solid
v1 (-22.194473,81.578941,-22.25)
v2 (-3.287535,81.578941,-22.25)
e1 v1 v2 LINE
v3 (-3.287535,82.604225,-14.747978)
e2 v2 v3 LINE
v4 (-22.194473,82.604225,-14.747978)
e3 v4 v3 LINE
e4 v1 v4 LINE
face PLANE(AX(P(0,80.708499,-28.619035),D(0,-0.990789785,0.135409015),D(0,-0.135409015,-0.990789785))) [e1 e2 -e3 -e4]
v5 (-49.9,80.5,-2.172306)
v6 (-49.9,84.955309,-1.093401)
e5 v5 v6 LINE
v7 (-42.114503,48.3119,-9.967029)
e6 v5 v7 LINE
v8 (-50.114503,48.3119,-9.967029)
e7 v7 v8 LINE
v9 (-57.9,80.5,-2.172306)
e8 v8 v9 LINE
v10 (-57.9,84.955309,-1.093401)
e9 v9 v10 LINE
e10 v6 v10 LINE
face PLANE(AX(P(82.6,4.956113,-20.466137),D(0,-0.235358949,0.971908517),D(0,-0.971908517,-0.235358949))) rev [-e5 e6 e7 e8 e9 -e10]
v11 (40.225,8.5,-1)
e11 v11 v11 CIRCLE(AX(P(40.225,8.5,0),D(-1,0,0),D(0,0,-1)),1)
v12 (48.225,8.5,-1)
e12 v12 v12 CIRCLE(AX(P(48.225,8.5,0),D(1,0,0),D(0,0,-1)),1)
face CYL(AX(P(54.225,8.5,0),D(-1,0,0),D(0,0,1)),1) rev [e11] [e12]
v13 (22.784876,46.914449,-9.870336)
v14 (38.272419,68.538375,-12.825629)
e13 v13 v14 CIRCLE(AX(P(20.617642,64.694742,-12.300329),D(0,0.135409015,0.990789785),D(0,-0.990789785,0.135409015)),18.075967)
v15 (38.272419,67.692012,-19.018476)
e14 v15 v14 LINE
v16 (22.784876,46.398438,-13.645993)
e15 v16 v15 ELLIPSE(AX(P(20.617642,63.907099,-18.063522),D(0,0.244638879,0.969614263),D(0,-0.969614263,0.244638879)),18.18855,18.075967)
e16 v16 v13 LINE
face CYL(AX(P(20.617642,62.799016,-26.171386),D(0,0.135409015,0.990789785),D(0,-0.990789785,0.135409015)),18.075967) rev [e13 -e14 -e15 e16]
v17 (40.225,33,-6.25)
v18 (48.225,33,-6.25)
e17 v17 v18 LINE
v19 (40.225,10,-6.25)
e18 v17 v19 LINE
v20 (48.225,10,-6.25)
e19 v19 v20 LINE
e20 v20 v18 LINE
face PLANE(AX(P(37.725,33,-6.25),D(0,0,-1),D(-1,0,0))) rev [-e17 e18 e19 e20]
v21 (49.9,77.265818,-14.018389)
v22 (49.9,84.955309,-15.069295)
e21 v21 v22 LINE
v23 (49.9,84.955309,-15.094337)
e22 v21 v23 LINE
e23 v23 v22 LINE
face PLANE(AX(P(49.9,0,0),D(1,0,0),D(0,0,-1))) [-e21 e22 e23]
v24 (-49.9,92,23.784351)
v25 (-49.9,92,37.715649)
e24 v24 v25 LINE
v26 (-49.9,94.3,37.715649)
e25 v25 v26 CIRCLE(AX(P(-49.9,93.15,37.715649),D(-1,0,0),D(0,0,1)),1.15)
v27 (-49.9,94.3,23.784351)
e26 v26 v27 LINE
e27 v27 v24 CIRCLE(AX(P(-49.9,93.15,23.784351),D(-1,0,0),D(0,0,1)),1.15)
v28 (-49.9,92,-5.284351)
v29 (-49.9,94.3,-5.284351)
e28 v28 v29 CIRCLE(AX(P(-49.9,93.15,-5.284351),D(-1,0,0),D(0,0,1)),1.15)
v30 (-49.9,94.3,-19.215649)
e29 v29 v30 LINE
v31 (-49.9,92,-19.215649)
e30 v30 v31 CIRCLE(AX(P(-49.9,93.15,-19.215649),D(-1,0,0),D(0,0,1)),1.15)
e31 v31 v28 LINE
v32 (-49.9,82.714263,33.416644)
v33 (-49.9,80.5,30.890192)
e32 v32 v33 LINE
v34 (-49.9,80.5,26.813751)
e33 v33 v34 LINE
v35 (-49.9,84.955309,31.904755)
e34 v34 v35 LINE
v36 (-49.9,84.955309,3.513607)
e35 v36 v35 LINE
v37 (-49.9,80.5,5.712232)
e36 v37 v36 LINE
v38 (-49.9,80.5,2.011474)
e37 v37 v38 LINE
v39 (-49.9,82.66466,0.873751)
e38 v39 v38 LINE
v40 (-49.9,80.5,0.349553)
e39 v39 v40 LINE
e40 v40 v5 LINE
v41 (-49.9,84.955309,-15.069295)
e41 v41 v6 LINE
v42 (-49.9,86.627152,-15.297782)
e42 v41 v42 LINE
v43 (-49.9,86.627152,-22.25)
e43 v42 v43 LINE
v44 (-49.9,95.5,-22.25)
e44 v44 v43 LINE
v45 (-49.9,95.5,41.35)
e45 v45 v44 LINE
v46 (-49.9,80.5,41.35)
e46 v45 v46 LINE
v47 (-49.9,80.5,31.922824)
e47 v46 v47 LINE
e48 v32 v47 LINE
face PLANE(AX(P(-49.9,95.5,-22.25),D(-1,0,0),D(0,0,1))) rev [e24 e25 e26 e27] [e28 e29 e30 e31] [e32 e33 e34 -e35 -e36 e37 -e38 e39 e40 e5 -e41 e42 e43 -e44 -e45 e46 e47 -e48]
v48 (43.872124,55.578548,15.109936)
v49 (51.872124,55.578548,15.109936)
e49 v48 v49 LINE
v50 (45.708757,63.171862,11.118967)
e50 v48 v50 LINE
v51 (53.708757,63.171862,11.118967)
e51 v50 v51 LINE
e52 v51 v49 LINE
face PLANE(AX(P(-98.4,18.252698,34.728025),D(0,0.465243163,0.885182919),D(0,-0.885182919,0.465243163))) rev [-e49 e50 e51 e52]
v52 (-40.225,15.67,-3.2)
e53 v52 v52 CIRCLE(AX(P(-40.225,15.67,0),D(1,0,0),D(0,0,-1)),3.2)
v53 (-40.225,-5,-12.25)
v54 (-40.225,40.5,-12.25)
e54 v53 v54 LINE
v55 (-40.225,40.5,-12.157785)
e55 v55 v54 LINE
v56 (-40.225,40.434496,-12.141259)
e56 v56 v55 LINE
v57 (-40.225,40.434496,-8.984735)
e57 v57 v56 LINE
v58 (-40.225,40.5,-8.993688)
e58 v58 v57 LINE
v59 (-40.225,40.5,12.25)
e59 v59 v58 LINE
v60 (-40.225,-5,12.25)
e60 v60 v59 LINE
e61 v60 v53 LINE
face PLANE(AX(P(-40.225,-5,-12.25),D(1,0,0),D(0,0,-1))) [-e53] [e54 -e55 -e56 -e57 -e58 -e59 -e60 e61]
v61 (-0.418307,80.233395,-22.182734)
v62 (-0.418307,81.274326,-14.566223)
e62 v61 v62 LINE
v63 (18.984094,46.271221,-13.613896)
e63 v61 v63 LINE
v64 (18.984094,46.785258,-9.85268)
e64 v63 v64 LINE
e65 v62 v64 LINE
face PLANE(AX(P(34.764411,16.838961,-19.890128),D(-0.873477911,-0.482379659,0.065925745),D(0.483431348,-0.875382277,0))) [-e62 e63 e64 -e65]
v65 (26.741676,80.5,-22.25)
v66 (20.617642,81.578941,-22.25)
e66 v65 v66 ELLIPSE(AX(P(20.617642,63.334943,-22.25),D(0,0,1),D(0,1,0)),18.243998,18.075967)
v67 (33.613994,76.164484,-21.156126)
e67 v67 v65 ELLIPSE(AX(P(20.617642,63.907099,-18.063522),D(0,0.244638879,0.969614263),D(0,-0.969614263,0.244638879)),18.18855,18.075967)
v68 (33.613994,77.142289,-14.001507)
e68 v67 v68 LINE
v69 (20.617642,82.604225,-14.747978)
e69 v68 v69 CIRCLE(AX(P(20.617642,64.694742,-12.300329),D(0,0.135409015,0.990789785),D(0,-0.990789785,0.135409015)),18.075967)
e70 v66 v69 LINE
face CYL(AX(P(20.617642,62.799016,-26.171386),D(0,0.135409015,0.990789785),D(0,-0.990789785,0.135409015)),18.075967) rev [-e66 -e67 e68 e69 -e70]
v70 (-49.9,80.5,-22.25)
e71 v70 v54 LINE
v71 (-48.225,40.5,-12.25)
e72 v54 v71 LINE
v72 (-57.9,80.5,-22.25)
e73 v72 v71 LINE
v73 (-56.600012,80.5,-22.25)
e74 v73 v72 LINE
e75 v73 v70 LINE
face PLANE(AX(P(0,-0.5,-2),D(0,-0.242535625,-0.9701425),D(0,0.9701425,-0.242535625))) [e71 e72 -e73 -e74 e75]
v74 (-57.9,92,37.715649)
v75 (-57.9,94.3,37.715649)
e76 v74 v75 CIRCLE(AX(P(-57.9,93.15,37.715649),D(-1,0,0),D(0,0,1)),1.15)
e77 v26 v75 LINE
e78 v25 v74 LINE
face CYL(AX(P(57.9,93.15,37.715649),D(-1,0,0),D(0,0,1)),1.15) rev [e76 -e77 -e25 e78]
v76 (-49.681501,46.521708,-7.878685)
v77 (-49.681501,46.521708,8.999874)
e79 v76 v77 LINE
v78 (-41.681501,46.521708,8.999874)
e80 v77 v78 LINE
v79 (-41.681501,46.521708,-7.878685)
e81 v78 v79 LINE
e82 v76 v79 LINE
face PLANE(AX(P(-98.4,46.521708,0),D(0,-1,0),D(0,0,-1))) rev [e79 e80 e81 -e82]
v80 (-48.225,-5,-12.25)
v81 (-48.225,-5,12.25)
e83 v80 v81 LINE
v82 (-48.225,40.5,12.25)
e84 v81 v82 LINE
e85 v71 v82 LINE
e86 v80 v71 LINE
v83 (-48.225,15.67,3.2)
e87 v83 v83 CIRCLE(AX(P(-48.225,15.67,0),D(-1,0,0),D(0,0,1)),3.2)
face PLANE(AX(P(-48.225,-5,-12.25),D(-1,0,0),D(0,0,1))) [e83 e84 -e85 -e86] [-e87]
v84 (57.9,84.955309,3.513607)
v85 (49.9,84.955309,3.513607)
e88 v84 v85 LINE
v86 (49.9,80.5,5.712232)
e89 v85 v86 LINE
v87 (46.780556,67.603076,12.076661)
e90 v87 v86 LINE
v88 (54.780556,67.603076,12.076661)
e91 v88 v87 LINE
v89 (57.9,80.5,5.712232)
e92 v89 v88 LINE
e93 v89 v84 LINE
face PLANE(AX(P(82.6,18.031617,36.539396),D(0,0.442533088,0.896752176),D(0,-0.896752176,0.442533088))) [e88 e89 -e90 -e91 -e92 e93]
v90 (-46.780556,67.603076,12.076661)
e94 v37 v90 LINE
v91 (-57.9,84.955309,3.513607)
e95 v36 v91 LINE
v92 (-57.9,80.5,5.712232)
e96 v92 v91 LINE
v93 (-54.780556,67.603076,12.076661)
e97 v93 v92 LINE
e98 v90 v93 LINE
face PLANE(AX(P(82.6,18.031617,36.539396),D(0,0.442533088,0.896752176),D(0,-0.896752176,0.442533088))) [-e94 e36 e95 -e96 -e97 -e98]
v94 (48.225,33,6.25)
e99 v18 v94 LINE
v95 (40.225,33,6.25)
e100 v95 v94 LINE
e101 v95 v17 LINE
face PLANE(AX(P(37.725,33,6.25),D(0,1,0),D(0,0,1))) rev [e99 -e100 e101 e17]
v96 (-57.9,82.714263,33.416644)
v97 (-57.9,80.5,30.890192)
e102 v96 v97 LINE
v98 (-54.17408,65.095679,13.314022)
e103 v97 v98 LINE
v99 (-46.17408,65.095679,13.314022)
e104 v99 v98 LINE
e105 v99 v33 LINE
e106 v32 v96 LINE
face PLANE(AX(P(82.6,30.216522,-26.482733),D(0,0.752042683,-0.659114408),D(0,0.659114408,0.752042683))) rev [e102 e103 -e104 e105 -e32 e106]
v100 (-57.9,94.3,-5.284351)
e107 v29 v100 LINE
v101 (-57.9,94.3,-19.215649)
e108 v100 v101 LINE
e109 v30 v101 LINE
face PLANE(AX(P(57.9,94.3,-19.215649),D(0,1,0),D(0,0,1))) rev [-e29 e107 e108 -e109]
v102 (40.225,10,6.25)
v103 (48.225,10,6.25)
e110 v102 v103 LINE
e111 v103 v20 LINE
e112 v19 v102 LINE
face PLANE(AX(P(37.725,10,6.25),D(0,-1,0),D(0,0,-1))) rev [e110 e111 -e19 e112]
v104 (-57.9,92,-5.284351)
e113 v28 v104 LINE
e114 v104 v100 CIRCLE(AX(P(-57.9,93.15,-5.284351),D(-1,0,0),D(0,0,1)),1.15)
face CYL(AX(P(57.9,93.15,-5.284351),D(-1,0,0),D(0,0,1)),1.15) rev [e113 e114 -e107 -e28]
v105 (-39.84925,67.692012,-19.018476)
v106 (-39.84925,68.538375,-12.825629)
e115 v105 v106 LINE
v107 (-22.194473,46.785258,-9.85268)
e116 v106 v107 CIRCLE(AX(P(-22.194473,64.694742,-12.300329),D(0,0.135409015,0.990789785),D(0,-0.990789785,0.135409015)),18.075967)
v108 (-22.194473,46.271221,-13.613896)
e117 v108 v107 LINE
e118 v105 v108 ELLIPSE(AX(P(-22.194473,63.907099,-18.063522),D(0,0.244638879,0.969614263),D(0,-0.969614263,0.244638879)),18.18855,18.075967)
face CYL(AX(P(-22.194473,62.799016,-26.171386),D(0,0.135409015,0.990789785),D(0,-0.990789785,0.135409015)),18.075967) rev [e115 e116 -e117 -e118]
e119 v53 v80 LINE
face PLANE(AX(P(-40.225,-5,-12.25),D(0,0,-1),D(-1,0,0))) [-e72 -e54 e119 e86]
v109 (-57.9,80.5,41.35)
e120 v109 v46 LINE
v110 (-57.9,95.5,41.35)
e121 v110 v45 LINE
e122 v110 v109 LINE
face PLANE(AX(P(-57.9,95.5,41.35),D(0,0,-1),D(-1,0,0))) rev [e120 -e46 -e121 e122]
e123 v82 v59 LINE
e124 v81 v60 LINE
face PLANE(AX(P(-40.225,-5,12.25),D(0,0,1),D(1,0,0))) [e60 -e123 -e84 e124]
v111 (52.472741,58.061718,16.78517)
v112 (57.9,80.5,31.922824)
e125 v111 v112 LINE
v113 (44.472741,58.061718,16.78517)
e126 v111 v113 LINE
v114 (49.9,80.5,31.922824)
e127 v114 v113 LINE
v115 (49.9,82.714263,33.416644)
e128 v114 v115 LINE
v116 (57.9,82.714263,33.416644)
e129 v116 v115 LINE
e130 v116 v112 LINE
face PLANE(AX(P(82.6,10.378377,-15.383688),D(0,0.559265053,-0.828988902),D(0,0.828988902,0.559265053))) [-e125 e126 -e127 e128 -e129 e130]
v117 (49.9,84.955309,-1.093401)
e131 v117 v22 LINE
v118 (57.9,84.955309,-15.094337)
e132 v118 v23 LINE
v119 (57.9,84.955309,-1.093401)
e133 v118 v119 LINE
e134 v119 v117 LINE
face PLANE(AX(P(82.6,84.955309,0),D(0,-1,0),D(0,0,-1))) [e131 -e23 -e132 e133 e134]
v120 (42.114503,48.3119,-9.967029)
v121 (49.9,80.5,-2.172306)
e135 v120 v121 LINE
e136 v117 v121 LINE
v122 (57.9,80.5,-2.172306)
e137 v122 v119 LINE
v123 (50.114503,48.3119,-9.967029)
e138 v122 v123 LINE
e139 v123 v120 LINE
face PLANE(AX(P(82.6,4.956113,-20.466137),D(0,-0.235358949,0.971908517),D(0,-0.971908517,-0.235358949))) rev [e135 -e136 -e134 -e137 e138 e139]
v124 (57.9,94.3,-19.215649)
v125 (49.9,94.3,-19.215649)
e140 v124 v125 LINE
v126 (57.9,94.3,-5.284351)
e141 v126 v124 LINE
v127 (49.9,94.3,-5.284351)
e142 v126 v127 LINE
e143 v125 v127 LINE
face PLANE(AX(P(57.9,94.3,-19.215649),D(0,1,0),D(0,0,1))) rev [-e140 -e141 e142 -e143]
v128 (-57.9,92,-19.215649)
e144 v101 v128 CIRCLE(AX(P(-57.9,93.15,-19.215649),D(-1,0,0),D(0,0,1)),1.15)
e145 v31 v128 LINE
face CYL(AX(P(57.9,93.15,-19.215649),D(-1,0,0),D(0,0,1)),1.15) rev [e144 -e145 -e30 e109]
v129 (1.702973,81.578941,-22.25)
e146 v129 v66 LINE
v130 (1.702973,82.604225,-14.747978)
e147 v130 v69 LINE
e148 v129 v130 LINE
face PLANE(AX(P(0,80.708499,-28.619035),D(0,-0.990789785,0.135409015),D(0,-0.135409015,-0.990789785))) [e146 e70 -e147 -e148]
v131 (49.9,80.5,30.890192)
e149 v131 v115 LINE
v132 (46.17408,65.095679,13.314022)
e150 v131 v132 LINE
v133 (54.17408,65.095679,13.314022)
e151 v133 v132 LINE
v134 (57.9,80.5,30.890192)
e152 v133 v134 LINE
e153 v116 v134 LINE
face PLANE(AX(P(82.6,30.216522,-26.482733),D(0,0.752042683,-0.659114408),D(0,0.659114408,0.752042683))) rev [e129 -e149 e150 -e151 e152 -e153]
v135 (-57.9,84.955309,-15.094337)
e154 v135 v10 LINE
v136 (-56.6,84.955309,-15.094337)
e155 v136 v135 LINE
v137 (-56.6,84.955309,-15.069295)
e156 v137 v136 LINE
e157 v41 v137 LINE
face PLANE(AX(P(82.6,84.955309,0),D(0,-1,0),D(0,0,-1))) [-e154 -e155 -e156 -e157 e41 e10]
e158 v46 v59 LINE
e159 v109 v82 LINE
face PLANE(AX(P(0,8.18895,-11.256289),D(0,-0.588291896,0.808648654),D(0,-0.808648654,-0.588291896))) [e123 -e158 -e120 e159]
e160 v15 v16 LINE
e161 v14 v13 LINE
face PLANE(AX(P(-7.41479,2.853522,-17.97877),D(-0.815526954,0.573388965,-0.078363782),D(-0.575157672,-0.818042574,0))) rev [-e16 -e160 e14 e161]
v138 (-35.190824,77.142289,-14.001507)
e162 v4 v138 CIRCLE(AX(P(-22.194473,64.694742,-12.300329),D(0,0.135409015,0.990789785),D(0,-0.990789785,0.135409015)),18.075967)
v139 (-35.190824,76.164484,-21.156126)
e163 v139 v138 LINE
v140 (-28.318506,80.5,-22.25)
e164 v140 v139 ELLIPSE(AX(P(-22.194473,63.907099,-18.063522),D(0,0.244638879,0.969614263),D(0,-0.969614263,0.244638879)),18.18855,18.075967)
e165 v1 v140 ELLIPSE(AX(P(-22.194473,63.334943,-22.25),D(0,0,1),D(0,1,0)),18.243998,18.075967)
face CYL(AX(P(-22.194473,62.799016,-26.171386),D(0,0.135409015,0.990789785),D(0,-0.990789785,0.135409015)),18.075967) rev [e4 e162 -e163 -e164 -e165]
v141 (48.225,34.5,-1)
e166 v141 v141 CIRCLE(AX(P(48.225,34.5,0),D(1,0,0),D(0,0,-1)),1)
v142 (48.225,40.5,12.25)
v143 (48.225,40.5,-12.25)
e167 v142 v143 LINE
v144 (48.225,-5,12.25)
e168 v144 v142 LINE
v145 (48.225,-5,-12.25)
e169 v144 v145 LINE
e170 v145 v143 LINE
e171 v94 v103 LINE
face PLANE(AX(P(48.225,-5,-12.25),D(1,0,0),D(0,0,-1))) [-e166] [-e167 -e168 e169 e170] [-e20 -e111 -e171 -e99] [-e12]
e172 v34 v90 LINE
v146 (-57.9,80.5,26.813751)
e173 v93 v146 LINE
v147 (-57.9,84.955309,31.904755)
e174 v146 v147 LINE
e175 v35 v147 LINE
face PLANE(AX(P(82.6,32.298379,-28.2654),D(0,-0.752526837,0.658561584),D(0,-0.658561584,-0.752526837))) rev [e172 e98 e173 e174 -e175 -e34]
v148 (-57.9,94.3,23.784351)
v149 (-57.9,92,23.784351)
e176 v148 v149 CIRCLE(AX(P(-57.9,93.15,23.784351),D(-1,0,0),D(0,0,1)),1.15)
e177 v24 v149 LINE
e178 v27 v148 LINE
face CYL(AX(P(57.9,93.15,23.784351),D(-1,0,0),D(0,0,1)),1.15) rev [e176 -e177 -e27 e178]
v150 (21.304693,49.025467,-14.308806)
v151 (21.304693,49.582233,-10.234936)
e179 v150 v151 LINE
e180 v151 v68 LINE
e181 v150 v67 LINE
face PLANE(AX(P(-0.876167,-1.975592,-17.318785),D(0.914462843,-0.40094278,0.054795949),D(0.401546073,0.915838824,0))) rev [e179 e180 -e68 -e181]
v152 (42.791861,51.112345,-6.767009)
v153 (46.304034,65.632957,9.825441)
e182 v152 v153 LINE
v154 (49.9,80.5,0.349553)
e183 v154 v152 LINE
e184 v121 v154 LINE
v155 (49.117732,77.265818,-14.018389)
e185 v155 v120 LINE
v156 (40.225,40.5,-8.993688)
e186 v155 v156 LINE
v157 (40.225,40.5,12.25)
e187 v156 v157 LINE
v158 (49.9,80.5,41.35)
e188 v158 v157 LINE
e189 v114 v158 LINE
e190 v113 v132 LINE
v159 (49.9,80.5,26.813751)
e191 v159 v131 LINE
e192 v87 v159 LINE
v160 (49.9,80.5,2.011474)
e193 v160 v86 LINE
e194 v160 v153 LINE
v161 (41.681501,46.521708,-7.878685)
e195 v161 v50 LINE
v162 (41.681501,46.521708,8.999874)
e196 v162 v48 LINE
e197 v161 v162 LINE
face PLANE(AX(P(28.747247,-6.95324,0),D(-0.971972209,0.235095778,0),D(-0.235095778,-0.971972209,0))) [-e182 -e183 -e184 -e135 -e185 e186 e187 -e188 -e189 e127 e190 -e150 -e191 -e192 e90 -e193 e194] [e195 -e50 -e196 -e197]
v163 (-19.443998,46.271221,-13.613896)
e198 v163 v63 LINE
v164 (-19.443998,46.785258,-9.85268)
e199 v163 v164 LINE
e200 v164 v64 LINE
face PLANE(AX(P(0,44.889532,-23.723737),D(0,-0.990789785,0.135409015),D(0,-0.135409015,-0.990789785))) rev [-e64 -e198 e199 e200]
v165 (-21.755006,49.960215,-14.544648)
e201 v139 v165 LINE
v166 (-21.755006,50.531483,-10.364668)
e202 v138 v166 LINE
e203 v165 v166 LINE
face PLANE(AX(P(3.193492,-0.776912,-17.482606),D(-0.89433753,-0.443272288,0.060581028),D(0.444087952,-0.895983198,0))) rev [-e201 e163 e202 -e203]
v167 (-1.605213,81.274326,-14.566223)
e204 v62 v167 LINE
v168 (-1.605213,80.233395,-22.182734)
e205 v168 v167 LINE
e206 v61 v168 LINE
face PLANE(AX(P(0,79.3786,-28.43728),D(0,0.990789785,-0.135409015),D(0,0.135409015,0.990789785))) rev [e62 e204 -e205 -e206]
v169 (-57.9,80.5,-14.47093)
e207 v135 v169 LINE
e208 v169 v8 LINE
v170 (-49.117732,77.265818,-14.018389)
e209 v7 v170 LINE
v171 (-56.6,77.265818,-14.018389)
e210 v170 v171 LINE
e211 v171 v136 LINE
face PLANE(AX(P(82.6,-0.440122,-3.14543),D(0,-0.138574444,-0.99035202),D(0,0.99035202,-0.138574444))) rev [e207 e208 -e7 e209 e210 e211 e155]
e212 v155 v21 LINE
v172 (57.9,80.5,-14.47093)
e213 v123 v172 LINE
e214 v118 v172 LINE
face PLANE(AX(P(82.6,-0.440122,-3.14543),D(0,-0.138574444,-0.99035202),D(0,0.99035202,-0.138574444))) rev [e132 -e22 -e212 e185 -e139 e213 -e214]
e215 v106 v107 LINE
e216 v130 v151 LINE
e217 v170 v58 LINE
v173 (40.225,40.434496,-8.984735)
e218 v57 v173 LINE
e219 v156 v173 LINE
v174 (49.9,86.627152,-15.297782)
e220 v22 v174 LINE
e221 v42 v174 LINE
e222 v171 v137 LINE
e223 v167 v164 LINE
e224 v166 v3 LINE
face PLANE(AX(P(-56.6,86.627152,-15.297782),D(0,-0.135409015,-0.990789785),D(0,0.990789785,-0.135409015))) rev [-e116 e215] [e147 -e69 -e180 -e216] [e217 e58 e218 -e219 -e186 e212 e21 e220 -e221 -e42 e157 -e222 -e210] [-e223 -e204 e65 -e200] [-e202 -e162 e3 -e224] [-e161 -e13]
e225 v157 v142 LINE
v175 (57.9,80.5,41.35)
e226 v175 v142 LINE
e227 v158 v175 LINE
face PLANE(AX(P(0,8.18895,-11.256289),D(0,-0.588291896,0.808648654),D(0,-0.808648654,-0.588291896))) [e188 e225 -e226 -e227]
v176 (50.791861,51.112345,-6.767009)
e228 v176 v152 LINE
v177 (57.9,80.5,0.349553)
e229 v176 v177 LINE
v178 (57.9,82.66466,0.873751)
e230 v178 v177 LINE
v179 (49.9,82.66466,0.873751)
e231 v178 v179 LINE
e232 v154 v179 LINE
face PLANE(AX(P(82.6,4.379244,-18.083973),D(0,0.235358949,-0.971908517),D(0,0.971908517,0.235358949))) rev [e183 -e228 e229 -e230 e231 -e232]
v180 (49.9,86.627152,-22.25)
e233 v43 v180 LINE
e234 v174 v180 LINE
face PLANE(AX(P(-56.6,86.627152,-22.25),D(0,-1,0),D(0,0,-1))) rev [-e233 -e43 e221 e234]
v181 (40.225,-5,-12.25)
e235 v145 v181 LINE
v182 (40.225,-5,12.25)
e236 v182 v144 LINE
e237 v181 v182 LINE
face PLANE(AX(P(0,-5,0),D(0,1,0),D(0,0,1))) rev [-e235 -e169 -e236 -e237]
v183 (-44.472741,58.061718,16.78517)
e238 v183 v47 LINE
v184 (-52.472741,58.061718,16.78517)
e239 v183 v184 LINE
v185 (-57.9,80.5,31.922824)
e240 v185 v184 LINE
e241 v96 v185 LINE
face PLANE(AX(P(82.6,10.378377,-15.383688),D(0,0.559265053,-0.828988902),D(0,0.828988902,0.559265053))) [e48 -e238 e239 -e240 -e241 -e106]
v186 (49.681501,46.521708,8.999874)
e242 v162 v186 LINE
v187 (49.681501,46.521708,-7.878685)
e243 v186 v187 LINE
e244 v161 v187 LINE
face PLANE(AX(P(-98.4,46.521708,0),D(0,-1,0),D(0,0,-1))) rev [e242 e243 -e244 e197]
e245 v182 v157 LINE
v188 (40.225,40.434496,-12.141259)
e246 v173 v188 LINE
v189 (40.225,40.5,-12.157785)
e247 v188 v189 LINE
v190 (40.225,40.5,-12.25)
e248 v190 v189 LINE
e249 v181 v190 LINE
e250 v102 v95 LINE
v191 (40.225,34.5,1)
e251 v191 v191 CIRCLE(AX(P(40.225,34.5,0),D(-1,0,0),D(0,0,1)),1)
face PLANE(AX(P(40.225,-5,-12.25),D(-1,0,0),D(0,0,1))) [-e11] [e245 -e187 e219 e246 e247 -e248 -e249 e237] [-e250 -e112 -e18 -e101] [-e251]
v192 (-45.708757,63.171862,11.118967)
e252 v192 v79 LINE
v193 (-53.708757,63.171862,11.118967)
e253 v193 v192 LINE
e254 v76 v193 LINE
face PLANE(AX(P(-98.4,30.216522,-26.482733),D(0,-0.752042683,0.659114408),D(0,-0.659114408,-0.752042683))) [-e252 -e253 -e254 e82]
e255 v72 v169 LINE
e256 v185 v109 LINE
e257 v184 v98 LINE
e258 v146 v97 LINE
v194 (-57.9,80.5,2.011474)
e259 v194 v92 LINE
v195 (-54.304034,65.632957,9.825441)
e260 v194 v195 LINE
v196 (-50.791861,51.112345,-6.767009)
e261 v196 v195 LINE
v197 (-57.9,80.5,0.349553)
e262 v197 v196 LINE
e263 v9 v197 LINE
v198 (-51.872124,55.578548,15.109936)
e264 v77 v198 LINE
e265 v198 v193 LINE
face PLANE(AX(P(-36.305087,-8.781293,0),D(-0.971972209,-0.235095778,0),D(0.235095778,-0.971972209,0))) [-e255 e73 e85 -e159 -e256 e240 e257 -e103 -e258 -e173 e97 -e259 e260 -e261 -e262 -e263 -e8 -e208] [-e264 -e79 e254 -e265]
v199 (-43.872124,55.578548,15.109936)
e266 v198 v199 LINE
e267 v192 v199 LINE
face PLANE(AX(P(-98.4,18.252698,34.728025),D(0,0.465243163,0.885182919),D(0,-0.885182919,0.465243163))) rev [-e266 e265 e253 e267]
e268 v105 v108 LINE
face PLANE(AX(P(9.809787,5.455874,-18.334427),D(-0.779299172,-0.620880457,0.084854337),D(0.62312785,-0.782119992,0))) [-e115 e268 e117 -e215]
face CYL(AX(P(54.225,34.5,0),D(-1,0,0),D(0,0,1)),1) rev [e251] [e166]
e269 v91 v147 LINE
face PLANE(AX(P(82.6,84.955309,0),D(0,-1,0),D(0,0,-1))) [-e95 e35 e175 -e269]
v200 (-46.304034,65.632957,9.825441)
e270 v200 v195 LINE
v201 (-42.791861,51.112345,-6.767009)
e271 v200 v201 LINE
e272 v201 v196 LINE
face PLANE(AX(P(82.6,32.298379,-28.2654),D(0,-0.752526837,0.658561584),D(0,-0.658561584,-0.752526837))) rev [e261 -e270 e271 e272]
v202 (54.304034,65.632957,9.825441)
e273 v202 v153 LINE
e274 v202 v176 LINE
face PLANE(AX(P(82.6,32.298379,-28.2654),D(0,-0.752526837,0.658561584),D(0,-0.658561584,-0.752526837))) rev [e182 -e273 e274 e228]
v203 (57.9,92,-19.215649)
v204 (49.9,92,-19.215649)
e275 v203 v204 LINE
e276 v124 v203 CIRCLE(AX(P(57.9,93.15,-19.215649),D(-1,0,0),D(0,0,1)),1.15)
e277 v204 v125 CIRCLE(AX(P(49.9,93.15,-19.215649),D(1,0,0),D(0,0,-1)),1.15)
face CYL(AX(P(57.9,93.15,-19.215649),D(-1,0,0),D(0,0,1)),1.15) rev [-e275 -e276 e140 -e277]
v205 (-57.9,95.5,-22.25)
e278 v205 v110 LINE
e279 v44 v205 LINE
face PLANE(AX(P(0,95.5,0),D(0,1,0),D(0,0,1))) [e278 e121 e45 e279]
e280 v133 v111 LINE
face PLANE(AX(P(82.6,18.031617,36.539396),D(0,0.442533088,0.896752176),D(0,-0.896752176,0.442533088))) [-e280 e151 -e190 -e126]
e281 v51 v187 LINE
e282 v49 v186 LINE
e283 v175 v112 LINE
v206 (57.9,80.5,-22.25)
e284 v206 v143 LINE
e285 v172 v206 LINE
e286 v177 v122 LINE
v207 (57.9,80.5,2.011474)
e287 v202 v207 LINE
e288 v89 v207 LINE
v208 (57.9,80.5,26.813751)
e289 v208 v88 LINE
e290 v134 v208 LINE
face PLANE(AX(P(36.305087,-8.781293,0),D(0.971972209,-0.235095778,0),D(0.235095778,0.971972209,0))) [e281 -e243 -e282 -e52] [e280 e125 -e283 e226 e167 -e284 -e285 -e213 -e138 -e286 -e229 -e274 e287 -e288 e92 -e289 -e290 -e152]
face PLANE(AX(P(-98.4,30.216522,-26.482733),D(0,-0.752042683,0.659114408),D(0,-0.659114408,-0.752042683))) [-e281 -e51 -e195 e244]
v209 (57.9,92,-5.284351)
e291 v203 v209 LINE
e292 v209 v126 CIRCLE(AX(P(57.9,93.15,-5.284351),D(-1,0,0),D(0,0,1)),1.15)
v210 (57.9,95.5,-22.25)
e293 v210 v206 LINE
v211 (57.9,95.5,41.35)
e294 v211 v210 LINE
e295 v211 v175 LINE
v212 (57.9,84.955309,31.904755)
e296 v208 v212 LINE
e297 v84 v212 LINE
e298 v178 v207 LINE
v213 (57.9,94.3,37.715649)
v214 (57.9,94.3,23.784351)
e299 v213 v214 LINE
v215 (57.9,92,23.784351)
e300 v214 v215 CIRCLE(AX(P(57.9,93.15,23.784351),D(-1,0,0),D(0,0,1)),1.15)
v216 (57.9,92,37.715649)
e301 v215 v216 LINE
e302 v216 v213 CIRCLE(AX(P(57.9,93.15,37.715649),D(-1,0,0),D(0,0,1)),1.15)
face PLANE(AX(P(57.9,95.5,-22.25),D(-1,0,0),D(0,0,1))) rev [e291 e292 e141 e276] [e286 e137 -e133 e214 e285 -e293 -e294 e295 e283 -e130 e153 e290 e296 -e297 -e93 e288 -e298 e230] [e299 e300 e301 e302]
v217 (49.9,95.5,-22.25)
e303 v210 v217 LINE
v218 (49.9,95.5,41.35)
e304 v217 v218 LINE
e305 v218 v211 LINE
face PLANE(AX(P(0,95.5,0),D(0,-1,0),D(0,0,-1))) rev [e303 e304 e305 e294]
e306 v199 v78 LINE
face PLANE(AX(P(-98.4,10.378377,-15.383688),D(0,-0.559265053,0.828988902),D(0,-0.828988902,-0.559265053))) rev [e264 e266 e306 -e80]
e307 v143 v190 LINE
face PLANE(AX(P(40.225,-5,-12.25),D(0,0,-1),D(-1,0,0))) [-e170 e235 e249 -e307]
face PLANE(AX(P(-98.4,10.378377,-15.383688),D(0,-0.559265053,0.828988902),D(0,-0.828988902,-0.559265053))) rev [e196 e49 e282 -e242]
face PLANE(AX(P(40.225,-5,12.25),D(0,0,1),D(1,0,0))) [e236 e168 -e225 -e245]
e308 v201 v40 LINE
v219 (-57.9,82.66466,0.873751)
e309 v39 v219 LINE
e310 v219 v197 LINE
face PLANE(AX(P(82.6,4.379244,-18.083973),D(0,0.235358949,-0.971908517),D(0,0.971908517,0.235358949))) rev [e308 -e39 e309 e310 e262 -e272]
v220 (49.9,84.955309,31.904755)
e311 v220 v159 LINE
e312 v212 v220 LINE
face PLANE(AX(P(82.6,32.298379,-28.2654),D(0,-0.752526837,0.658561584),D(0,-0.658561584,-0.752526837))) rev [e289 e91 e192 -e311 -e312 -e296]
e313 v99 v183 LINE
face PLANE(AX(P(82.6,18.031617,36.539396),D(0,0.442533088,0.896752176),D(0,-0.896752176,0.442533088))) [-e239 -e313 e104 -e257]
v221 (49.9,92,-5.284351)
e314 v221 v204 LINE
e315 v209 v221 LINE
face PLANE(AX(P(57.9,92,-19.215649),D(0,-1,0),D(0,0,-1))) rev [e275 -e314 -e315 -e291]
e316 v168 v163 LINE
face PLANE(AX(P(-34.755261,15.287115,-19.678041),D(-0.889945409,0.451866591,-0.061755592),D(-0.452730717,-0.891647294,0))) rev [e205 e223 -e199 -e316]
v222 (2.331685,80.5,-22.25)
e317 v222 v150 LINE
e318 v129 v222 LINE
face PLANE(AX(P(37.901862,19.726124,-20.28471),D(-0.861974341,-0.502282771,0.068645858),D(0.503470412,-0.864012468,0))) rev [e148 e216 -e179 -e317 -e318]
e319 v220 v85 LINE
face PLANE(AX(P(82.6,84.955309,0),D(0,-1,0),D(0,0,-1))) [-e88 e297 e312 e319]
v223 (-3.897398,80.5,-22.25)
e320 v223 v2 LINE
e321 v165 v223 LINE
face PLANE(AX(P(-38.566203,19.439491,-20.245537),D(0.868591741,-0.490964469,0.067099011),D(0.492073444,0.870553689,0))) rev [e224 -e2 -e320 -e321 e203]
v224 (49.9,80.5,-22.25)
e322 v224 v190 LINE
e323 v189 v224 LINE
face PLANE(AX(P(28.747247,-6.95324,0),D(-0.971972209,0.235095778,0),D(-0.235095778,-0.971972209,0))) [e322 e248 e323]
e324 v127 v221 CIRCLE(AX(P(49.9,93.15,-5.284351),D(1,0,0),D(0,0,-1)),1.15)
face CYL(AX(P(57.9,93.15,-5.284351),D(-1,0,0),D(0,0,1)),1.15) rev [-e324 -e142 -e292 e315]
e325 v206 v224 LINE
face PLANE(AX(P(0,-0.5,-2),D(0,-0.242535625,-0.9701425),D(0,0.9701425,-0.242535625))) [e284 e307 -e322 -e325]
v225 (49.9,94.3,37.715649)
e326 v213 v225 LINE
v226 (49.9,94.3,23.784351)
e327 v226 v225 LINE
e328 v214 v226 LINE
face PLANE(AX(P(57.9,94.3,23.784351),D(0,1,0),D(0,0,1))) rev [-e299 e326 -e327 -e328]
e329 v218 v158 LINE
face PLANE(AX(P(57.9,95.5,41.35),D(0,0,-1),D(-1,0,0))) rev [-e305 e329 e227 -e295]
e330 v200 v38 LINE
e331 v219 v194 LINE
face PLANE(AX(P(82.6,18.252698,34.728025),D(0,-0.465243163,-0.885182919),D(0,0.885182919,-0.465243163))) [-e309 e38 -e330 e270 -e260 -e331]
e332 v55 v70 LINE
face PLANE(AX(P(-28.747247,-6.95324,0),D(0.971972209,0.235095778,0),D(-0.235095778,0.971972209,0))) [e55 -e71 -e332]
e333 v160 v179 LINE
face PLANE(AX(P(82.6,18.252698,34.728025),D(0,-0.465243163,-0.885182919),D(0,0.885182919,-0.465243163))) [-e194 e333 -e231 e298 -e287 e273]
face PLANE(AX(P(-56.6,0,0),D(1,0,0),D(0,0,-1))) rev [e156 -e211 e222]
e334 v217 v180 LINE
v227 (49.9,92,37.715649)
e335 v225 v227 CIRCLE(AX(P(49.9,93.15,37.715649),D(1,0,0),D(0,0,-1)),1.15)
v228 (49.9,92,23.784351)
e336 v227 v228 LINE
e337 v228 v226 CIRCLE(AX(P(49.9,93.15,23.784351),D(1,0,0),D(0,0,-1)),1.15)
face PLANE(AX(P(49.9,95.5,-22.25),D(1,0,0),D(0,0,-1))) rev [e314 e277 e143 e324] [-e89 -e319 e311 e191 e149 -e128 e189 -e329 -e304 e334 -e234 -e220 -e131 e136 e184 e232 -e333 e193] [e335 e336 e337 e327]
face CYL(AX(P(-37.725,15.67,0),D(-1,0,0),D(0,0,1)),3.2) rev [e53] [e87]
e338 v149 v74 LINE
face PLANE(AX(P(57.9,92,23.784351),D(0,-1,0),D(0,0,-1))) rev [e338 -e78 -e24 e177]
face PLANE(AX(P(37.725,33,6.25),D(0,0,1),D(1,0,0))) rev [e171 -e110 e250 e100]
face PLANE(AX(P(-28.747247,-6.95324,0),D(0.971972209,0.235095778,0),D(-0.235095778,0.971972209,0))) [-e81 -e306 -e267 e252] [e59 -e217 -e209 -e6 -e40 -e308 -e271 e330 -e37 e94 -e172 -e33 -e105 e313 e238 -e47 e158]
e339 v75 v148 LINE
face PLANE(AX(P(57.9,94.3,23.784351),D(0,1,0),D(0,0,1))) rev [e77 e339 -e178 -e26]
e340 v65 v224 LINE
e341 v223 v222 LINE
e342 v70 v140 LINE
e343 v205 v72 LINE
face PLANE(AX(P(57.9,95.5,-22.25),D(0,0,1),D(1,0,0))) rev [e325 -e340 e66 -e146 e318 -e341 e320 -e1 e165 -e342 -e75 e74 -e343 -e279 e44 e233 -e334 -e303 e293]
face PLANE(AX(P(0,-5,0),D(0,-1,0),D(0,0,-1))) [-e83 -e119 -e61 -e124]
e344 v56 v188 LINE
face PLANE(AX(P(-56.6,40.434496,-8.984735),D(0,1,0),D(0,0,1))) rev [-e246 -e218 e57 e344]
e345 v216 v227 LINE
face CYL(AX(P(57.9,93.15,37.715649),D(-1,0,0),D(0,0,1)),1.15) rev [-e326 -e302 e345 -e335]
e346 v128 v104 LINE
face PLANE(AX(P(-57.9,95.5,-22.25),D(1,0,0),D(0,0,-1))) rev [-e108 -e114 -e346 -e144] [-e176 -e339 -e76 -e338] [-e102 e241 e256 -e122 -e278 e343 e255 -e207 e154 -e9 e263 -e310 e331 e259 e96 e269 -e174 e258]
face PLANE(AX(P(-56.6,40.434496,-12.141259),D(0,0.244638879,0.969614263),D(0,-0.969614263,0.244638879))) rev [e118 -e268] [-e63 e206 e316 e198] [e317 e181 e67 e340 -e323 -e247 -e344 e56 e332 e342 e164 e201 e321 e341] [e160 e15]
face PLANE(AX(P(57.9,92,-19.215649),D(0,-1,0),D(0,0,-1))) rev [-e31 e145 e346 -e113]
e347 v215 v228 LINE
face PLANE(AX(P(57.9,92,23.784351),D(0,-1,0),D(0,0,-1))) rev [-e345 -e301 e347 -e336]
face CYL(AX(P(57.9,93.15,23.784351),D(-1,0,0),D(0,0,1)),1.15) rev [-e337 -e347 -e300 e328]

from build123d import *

# Parameters (mm, degrees)
BOSS_EXTRU_1_DEPTH                    = 40.5
BOSS_EXTRU_1_DEPTH_BACK               = 5
ESQUISSE1_W                           = 8
ESQUISSE1_H                           = 24.5
BOSS_EXTRU_1_2_DEPTH                  = 40.5
BOSS_EXTRU_1_2_DEPTH_BACK             = 5
ESQUISSE3_R                           = 3.2
ENL_V_MAT_EXTRU_1_DEPTH               = 10.5
ESQUISSE4_W                           = 12.5
ESQUISSE4_H                           = 23
ENL_V_MAT_EXTRU_2_DEPTH               = 10.5
ESQUISSE5_W                           = 8
ESQUISSE5_H                           = 63.6
BOSS_EXTRU_2_DEPTH                    = 15
BOSS_EXTRU_2_2_DEPTH                  = 15
ENL_V_MAT_EXTRU_3_DEPTH               = 156.691080348
ENL_V_START                           = -115.8
ENL_V_MAT_EXTRU_6_DEPTH               = 17.675
ENL_V_START_2                         = -17.675
ENL_V_MAT_EXTRU_6_2_DEPTH             = 17.675
BOSS_EXTRU_3_DEPTH                    = 106.5
ENL_VEMENT_START                      = -22.25
ENL_VEMENT_DE_MATI_RE_BALAYAGE1_DEPTH = 63.6
ENL_VEMENT_DE_MATI_RE_BALAYAGE2_DEPTH = 63.6
ENL_V_MAT_EXTRU_11_DEPTH              = 14
ESQUISSE14_R                          = 1
ENL_V_MAT_EXTRU_12_DEPTH              = 14


with BuildPart() as part:
    # Esquisse1 → Boss.-Extru.1 (new, two sides: drawn at the far end of the back side and taken through both)
    with BuildSketch(Plane(origin=(0, 0, 0), x_dir=(1, 0, 0), z_dir=(0, 1, 0)).offset(-BOSS_EXTRU_1_DEPTH_BACK)):
        with Locations((-44.225, 0)):
            Rectangle(ESQUISSE1_W, ESQUISSE1_H)
    extrude(amount=BOSS_EXTRU_1_DEPTH + BOSS_EXTRU_1_DEPTH_BACK)

    # Esquisse3 → Enlèv. mat.-Extru.1 (cut)
    with BuildSketch(Plane.ZY.offset(48.225)):
        with Locations((0, 15.67)):
            Circle(ESQUISSE3_R)
    extrude(amount=-ENL_V_MAT_EXTRU_1_DEPTH, mode=Mode.SUBTRACT)


with BuildPart() as body_2:
    # Esquisse1 → Boss.-Extru.1 2 (new, two sides: drawn at the far end of the back side and taken through both)
    with BuildSketch(Plane(origin=(0, 0, 0), x_dir=(1, 0, 0), z_dir=(0, 1, 0)).offset(-BOSS_EXTRU_1_2_DEPTH_BACK)):
        with Locations((44.225, 0)):
            Rectangle(ESQUISSE1_W, ESQUISSE1_H)
    extrude(amount=BOSS_EXTRU_1_2_DEPTH + BOSS_EXTRU_1_2_DEPTH_BACK)

    # Esquisse4 → Enlèv. mat.-Extru.2 (cut)
    with BuildSketch(Plane(origin=(48.225, 0, 0), x_dir=(0, 0, -1), z_dir=(1, 0, 0))):
        with Locations((0, 21.5)):
            Rectangle(ESQUISSE4_W, ESQUISSE4_H)
    extrude(amount=-ENL_V_MAT_EXTRU_2_DEPTH, mode=Mode.SUBTRACT)


with BuildPart() as body_3:
    # Esquisse5 → Boss.-Extru.2 (new body)
    with BuildSketch(Plane(origin=(0, 80.5, 0), x_dir=(1, 0, 0), z_dir=(0, 1, 0))):
        with Locations((-53.9, -9.55)):
            Rectangle(ESQUISSE5_W, ESQUISSE5_H)
    extrude(amount=BOSS_EXTRU_2_DEPTH)


with BuildPart() as body_4:
    # Esquisse5 → Boss.-Extru.2 2 (new body)
    with BuildSketch(Plane(origin=(0, 80.5, 0), x_dir=(1, 0, 0), z_dir=(0, 1, 0))):
        with Locations((53.9, -9.55)):
            Rectangle(ESQUISSE5_W, ESQUISSE5_H)
    extrude(amount=BOSS_EXTRU_2_2_DEPTH)


with BuildPart() as enl_v_mat_extru_3_tool:
    # Esquisse6 → Enlèv. mat.-Extru.3 (new, through all)
    with BuildSketch(Plane.ZY.offset(57.9)):
        with BuildLine():
            Line((-19.215648746, 94.3), (-5.284351254, 94.3))
            ThreePointArc((-5.284351254, 94.3), (-4.134351254, 93.15), (-5.284351254, 92))
            Line((-5.284351254, 92), (-19.215648746, 92))
            ThreePointArc((-19.215648746, 92), (-20.365648746, 93.15), (-19.215648746, 94.3))
        make_face()
        with BuildLine():
            Line((23.784351254, 94.3), (37.715648746, 94.3))
            ThreePointArc((37.715648746, 94.3), (38.865648746, 93.15), (37.715648746, 92))
            Line((37.715648746, 92), (23.784351254, 92))
            ThreePointArc((23.784351254, 92), (22.634351254, 93.15), (23.784351254, 94.3))
        make_face()
    extrude(amount=-ENL_V_MAT_EXTRU_3_DEPTH)


with BuildPart() as body_3_1:
    add(body_3.part)

    # Enlèv. mat.-Extru.3: cut by enl_v_mat_extru_3_tool
    add(enl_v_mat_extru_3_tool.part, mode=Mode.SUBTRACT)


    add(part.part)  # lissage2 joins it to this body
    # loft from a face of the part (lissage2)
    loft([body_3_1.faces().sort_by_distance((-53.9, 80.5, 9.55))[0], body_3_1.faces().sort_by_distance((-44.225, 40.5, 0))[0]])

    # Enl_v. mat.-Extru.6 2 outline → Enl_v. mat.-Extru.6 2 (cut)
    with BuildSketch(Plane.ZY.offset(57.9).offset(ENL_V_START_2)):
        Polygon((16.7851704, 58.061718477), (33.416643679, 82.714263273), (13.314021784, 65.095678551), align=None)
        Polygon((-7.878685189, 46.521708187), (8.999873816, 46.521708187), (15.109936371, 55.57854809), (11.118967449, 63.171862295), align=None)
        Polygon((3.513606596, 84.955309113), (12.07666079, 67.60307561), (31.90475538, 84.955309113), align=None)
        Polygon((-1.093401297, 84.955309113), (-15.094337023, 84.955309113), (-9.967028833, 48.311900258), align=None)
        Polygon((9.825440903, 65.632957253), (0.873750807, 82.664659801), (-6.767009008, 51.112345403), align=None)
    extrude(amount=ENL_V_MAT_EXTRU_6_2_DEPTH, mode=Mode.SUBTRACT)



with BuildPart() as body_4_1:
    add(body_4.part)

    # Enlèv. mat.-Extru.3: cut by enl_v_mat_extru_3_tool
    add(enl_v_mat_extru_3_tool.part, mode=Mode.SUBTRACT)


    add(body_2.part)  # lissage1 joins it to this body
    # loft from a face of the part (lissage1)
    loft([body_4_1.faces().sort_by_distance((53.9, 80.5, 9.55))[0], body_4_1.faces().sort_by_distance((44.225, 40.5, 0))[0]])

    # Enlèv. mat.-Extru.6: read off the stored shape, not the designer's step
    # Enlèv. mat.-Extru.6 outline → Enlèv. mat.-Extru.6 (cut)
    with BuildSketch(Plane.ZY.offset(57.9).offset(ENL_V_START)):
        Polygon((16.7851704, 58.061718477), (33.416643679, 82.714263273), (13.314021784, 65.095678551), align=None)
        Polygon((-7.878685189, 46.521708187), (8.999873816, 46.521708187), (15.109936371, 55.57854809), (11.118967449, 63.171862295), align=None)
        Polygon((3.513606596, 84.955309113), (12.07666079, 67.60307561), (31.90475538, 84.955309113), align=None)
        Polygon((-1.093401297, 84.955309113), (-15.094337023, 84.955309113), (-9.967028833, 48.311900258), align=None)
        Polygon((9.825440903, 65.632957253), (0.873750807, 82.664659801), (-6.767009008, 51.112345403), align=None)
    extrude(amount=ENL_V_MAT_EXTRU_6_DEPTH, mode=Mode.SUBTRACT)


with BuildPart() as body_3_2:
    add(body_3_1.part)

    add(body_4_1.part)  # Boss.-Extru.3 merges body 4
    # Esquisse9 → Boss.-Extru.3 (add)
    with BuildSketch(Plane.ZY.offset(-49.9)):
        Polygon((-22.25, 86.627151597), (-15.29778178, 86.627151597), (-8.984735346, 40.434496389), (-12.141258563, 40.434496389), (-22.25, 80.5), align=None)
    extrude(amount=BOSS_EXTRU_3_DEPTH)

    # Enlèvement de matière-Balayage1: read off the stored shape, not the designer's step
    # Enlèvement de matière-Balayage1 outline → Enlèvement de matière-Balayage1 (cut)
    with BuildSketch(Plane.XY.offset(ENL_VEMENT_START)):
        Polygon((49.9, 47.425064599), (48.225, 40.5), (48.225, 40.434496389), (49.9, 40.434496389), align=None)
    extrude(amount=ENL_VEMENT_DE_MATI_RE_BALAYAGE1_DEPTH, mode=Mode.SUBTRACT)

    # Enlèvement de matière-Balayage2: read off the stored shape, not the designer's step
    # Enlèvement de matière-Balayage2 outline → Enlèvement de matière-Balayage2 (cut)
    with BuildSketch(Plane.XY.offset(ENL_VEMENT_START)):
        Polygon((-48.225, 40.5), (-56.6, 75.125322997), (-56.6, 40.434496389), (-48.225, 40.434496389), align=None)
    extrude(amount=ENL_VEMENT_DE_MATI_RE_BALAYAGE2_DEPTH, mode=Mode.SUBTRACT)

    # Esquisse11 → Enlèv. mat.-Extru.11 (cut)
    with BuildSketch(Plane(origin=(0, -0.46401808, -3.395227235), x_dir=(1, 0, 0), z_dir=(0, 0.13540901456567775, 0.9907897853603217))):
        with BuildLine():
            Line((-3.287535233, 83.840431949), (-22.194472995, 83.840431949))
            ThreePointArc((-22.194472995, 83.840431949), (-29.253068949, 82.405282441), (-35.190824132, 78.327722591))
            Line((-35.190824132, 78.327722591), (-21.755006049, 51.469546885))
            Line((-21.755006049, 51.469546885), (-3.287535233, 83.840431949))
        make_face()
        with BuildLine():
            Line((-22.194472995, 47.688497503), (-39.849249541, 69.643827584))
            ThreePointArc((-39.849249541, 69.643827584), (-36.281059291, 54.43712269), (-22.194472995, 47.688497503))
        make_face()
        Polygon((-1.60521279, 82.498170098), (-19.443998314, 47.688497503), (18.984093957, 47.688497503), (-0.418307097, 82.498170098), align=None)
        with BuildLine():
            Line((20.617642495, 83.840431949), (1.70297306, 83.840431949))
            Line((1.70297306, 83.840431949), (21.304692687, 50.51147286))
            Line((21.304692687, 50.51147286), (33.613993633, 78.327722591))
            ThreePointArc((33.613993633, 78.327722591), (27.676238449, 82.405282441), (20.617642495, 83.840431949))
        make_face()
        with BuildLine():
            ThreePointArc((22.784876191, 47.818888972), (35.359080989, 55.303557395), (38.272419041, 69.643827584))
            Line((38.272419041, 69.643827584), (22.784876191, 47.818888972))
        make_face()
    extrude(amount=-ENL_V_MAT_EXTRU_11_DEPTH, mode=Mode.SUBTRACT)

    # Esquisse14 → Enlèv. mat.-Extru.12 (cut)
    with BuildSketch(Plane.ZY.offset(-40.225)):
        with Locations((0, 34.5)):
            Circle(ESQUISSE14_R)
        with Locations(Location((0, 8.5, 0), (0, 0, 180))):
            Circle(ESQUISSE14_R)
    extrude(amount=-ENL_V_MAT_EXTRU_12_DEPTH, mode=Mode.SUBTRACT)


solid = body_3_2.part
